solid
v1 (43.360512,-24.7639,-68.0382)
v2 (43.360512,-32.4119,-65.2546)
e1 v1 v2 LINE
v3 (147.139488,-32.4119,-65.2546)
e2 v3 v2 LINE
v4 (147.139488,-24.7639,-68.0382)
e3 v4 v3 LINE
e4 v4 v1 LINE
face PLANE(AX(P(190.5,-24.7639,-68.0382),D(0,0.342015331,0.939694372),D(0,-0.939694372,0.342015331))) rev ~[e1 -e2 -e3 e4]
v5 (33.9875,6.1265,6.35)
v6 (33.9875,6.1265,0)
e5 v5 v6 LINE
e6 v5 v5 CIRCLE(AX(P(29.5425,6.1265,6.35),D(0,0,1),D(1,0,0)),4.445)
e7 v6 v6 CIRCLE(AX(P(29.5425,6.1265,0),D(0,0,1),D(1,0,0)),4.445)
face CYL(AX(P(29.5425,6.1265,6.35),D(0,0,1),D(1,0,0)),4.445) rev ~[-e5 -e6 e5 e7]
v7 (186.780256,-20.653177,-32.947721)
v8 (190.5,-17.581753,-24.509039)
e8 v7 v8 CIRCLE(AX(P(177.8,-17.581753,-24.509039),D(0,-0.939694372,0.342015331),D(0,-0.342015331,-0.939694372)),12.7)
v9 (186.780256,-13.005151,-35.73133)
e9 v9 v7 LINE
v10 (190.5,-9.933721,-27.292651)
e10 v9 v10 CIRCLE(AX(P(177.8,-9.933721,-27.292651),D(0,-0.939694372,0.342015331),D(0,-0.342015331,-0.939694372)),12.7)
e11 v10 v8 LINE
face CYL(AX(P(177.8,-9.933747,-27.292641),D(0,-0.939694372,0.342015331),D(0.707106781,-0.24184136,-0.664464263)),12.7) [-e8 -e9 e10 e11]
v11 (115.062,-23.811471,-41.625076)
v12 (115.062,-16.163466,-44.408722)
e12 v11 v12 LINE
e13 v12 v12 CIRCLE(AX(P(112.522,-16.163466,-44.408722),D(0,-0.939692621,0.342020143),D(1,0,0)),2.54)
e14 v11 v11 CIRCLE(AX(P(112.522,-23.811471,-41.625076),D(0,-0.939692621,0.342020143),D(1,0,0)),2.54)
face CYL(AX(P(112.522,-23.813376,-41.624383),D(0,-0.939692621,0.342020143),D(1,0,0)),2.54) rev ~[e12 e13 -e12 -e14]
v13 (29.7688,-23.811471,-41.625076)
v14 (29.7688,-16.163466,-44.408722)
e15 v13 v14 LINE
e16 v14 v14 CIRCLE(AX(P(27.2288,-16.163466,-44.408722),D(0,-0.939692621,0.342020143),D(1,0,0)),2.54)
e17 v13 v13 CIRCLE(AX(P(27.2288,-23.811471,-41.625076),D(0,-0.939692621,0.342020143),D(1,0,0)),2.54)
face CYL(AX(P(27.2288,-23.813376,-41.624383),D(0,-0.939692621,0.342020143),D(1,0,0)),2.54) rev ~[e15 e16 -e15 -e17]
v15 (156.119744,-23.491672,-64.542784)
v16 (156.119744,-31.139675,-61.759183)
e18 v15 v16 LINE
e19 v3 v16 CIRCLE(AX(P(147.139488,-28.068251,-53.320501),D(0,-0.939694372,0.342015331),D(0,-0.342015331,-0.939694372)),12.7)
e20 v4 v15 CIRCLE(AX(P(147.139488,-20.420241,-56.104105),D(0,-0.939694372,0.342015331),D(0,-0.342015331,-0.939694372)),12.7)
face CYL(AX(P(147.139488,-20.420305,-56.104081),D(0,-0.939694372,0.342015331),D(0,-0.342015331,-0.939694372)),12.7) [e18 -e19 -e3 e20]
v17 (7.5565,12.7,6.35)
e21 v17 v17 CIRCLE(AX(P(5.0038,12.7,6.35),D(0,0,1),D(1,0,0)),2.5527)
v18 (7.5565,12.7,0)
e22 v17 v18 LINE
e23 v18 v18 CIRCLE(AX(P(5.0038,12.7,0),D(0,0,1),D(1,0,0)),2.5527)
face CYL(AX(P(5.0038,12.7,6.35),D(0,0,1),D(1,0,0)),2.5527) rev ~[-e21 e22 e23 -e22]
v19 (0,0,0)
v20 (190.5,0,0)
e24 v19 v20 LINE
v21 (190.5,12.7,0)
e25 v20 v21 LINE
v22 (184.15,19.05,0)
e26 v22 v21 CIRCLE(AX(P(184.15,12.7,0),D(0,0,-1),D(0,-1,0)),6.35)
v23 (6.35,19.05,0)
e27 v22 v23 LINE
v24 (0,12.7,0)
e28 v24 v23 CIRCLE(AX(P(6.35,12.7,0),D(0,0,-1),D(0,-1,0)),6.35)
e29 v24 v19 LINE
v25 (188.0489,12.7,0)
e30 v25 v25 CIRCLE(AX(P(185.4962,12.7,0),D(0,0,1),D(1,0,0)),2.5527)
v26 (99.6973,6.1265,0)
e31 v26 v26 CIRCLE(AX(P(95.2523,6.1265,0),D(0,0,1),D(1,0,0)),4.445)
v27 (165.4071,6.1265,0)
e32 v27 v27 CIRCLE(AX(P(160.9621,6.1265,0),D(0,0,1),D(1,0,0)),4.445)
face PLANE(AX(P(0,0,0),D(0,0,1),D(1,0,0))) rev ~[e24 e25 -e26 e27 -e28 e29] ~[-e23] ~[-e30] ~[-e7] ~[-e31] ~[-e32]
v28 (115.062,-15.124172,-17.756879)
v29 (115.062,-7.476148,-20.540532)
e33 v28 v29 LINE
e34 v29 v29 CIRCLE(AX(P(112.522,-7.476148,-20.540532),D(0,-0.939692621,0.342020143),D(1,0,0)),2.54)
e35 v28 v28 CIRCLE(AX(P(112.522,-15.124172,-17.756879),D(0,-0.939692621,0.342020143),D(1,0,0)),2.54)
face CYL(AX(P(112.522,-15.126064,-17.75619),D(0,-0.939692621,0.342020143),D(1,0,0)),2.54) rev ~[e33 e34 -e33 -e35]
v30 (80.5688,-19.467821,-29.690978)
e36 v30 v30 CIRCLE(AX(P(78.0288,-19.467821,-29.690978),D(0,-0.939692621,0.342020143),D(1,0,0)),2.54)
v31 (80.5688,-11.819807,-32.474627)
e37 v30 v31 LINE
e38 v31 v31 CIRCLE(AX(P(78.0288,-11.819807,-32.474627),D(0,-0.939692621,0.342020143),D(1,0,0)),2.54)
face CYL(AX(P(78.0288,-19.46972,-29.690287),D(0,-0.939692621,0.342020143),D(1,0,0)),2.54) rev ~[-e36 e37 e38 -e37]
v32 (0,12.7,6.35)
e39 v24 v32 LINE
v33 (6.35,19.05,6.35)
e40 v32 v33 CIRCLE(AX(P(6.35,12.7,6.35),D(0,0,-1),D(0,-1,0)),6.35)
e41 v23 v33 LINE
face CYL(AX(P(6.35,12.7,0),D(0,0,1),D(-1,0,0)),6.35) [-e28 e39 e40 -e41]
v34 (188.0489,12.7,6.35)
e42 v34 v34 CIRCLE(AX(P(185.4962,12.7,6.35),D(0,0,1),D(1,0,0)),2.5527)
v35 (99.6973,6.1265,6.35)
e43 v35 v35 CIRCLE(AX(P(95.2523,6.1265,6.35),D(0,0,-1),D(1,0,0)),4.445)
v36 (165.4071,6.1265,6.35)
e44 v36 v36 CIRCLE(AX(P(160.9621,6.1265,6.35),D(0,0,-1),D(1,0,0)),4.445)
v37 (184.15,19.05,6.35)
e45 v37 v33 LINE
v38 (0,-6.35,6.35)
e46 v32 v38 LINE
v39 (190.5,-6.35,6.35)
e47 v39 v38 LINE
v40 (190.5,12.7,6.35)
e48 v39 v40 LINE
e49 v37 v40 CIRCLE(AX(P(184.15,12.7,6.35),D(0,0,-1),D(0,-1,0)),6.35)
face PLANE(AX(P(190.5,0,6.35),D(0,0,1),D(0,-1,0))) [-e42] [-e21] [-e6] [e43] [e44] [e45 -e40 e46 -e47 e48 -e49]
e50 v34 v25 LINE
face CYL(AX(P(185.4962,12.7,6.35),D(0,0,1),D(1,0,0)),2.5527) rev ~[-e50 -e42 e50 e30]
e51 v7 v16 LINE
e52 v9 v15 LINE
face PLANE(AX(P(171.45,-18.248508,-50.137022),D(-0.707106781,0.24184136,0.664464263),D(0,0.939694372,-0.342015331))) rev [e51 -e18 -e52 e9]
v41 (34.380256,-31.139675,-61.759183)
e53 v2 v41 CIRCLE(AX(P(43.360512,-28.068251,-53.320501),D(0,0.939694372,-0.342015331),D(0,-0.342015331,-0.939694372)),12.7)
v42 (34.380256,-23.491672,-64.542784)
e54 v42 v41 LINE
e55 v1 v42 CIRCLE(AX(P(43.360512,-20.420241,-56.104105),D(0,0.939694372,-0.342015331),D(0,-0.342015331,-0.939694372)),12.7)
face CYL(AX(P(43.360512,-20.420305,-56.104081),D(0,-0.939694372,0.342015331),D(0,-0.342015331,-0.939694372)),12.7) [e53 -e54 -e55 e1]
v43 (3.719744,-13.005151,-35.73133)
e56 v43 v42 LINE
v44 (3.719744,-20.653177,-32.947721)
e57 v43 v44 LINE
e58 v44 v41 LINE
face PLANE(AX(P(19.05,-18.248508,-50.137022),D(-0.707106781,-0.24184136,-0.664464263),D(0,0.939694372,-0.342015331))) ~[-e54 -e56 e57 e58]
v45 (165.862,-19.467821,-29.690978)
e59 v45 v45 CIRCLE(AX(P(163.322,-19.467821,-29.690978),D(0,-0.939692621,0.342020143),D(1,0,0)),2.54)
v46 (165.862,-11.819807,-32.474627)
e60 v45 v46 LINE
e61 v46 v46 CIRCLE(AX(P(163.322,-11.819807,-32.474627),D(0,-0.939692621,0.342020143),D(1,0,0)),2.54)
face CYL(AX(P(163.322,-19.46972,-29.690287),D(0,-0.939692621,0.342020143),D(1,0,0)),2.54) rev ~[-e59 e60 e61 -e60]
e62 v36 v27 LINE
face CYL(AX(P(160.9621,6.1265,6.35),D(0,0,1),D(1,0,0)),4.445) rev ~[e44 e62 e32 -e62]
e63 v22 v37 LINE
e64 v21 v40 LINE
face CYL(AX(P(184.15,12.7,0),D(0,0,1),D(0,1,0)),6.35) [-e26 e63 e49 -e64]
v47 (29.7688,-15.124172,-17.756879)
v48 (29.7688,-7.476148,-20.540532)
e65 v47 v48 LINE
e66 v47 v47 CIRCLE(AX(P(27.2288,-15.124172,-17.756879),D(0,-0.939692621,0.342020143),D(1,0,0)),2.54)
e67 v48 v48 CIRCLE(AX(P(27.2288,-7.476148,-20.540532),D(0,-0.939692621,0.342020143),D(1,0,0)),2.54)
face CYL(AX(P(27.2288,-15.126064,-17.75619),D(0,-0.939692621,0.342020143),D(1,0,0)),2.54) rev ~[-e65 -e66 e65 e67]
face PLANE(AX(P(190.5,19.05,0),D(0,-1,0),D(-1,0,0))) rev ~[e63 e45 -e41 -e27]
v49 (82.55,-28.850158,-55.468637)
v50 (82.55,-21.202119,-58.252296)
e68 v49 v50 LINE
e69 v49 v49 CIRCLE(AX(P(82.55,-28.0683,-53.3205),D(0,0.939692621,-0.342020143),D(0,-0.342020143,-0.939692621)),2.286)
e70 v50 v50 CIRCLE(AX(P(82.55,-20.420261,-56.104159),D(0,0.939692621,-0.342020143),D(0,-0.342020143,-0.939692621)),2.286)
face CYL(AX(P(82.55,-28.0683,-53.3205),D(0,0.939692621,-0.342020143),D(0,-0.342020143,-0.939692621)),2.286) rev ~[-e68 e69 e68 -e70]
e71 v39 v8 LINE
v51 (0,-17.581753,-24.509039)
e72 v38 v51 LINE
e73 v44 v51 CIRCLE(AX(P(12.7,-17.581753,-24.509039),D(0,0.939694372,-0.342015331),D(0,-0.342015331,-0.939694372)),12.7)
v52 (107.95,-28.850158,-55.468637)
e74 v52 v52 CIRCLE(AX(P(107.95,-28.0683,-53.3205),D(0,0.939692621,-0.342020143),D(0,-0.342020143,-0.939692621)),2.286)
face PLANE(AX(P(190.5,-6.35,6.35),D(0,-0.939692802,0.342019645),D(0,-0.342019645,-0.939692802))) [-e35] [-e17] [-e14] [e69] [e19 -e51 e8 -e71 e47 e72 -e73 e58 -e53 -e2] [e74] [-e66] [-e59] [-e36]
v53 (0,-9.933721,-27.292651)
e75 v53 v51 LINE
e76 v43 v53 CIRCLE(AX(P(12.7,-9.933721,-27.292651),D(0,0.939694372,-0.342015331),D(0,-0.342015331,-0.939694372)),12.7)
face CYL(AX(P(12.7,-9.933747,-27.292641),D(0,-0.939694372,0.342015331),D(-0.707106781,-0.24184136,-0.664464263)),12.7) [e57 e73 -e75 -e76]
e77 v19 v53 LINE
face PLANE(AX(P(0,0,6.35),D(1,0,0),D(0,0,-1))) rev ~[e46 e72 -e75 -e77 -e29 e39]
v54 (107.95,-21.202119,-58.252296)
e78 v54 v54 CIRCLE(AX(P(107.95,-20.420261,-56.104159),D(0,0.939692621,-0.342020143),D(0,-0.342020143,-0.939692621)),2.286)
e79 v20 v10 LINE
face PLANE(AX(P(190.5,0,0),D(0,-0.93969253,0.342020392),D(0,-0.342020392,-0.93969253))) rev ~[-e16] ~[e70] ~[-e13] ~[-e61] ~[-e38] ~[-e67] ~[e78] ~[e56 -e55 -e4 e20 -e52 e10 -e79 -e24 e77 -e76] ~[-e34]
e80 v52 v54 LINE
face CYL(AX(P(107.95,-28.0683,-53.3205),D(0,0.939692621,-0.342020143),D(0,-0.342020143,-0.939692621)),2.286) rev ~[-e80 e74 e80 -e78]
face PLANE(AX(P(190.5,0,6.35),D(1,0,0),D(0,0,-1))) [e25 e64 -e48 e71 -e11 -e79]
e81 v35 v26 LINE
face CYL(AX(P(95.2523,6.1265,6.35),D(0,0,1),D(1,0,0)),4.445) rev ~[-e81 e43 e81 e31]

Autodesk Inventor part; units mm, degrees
ref_plane "YZ Plane" through (0, 0, 0) normal (1, 0, 0) x (0, 1, 0)
ref_plane "XZ Plane" through (0, 0, 0) normal (0, 1, 0) x (-1, 0, 0)
ref_plane "XY Plane" through (0, 0, 0) normal (0, 0, 1) x (1, 0, 0)
sketch "Sketch1" plane through (0, 0, 0) normal (0, 0, 1) x (1, 0, 0)
  line L0 (0, 0) -> (190.5, 0)
  line L1 (190.5, 0) -> (190.5, 19.05)
  line L2 (190.5, 19.05) -> (0, 19.05)
  line L3 (0, 19.05) -> (0, 0)
  dimension "d0" = 190.5
  dimension "d1" = 19.05
extrude "Extrusion1" add sketch "Sketch1" along normal blind 6.35
sketch "Sketch2" plane through (0, 0, 6.35) normal (0, 0, 1) x (1, 0, 0)
  circle A0 centre (5.0038, 12.7) radius 2.5527
  circle A1 centre (185.4962, 12.7) radius 2.5527
  line L0 (0, 19.05) -> (0, 0) projected
  line L1 (0, 0) -> (190.5, 0) projected
  point P0 (0, 9.525)
  point P1 (0, 9.525)
  dimension "d4" = 5.1054
  dimension "d5" = 5.1054
  dimension "d6" = 180.4924
  dimension "d10" = 5.0038
  dimension "d11" = 12.7
extrude "Extrusion2" cut sketch "Sketch2" against normal blind 6.35
fillet "Fillet1" radius 6.35 2 edges at (190.5, 19.05, 3.175) (0, 19.05, 3.175)
sketch "Sketch3" plane through (190.5, 0, 6.35) normal (1, 0, 0) x (0, 0, -1)
  line L0 (0, -6.35) -> (71.6046, -32.4119)
  line L1 (0, 0) -> (76.2, 0) construction
  line L2 (6.35, 12.7) -> (6.35, 0) projected
  line L3 (6.35, 0) -> (0, 0) projected
  line L4 (6.35, 0) -> (74.3882, -24.7639)
  line L5 (6.35, 0) -> (78.7548, 0) construction
  line L6 (74.3882, -24.7639) -> (71.6046, -32.4119)
  line L7 (0, 0) -> (0, 12.7) projected
  line L8 (0, 0) -> (0, -6.35)
  dimension "d13" = 76.2
  dimension "d14" = 20
  dimension "d17" = 20
  dimension "d18" = 6.35
extrude "Extrusion3" add sketch "Sketch3" against normal up to surface (190.5 mm away)
chamfer "Chamfer1" distance 38.1 angle 45 2 edges at (0, -28.5879, -66.6464) (190.5, -28.5879, -66.6464)
fillet "Fillet2" radius 12.7 4 edges at (38.1, -28.5879, -66.6464) (0, -15.5569, -30.8441) (152.4, -28.5879, -66.6464) (190.5, -15.5569, -30.8441)
sketch "Sketch5" plane through (0, 0, 6.35) normal (0, 0, 1) x (1, 0, 0)
  circle A0 centre (160.9621, 6.1265) radius 4.445
  circle A1 centre (185.4962, 12.7) radius 2.5527 projected
  line L0 (185.4962, 12.7) -> (176.5159, 21.6803)
  line L1 (185.4962, 12.7) -> (198.1962, 12.7) construction
  line L2 (176.5159, 21.6803) -> (160.9621, 6.1265)
  line L3 (160.9621, 6.1265) -> (95.2523, 6.1265)
  line L4 (95.2523, 6.1265) -> (29.5425, 6.1265)
  circle A2 centre (29.5425, 6.1265) radius 4.445
  circle A3 centre (95.2523, 6.1265) radius 4.445
  point P0 (0, 0)
  dimension "d24" = 8.89
  dimension "d25" = 12.7
  dimension "d26" = 135
  dimension "d27" = 21.9964
  dimension "d30" = 65.7098
  dimension "d31" = 65.7098
  dimension "d32" = 8.89
  dimension "d33" = 8.89
extrude "Extrusion4" cut sketch "Sketch5" against normal blind 25.4 contours A0 L3 L2 | L2 L3 A0 | A3 L4 L3 | L3 L4 A3 | A2
sketch "Sketch6" plane through (0, -6.35, 6.35) normal (0, -0.9396926, 0.3420201) x (1, 0, 0)
  circle A0 centre (163.322, -38.354) radius 2.54
  line L0 (190.5, 0) -> (190.5, -32.8395) projected
  line L1 (147.1395, -76.2) -> (43.3605, -76.2) projected
  circle A1 centre (112.522, -51.054) radius 2.54
  circle A2 centre (112.522, -25.654) radius 2.54
  circle A3 centre (78.0288, -38.354) radius 2.54
  circle A4 centre (27.2288, -25.654) radius 2.54
  circle A5 centre (27.2288, -51.054) radius 2.54
  point P0 (0, -3.7952)
  dimension "d34" = 27.178
  dimension "d35" = 37.846
  dimension "d36" = 5.08
  dimension "d39" = 5.08
  dimension "d40" = 12.7
  dimension "d41" = 50.8
  dimension "d42" = 5.08
  dimension "d43" = 50.8
  dimension "d44" = 12.7
  dimension "d45" = 85.2932
  dimension "d46" = 5.08
  dimension "d47" = 5.08
  dimension "d48" = 5.08
  dimension "d51" = 50.8
  dimension "d52" = 50.8
extrude "Extrusion5" cut sketch "Sketch6" against normal blind 25.4
sketch "Sketch8" plane through (0, -6.35, 6.35) normal (0, -0.9396926, 0.3420201) x (1, 0, 0)
  line L0 (147.1395, -76.2) -> (43.3605, -76.2) projected
  line L1 (95.25, -76.2) -> (95.25, -63.5)
  line L2 (95.25, -63.5) -> (82.55, -63.5)
  line L3 (95.25, -63.5) -> (107.95, -63.5)
  point P0 (0, -3.7952)
  dimension "d58" = 12.7
  dimension "d59" = 12.7
  dimension "d60" = 12.7
hole "Hole1" at (82.55, -28.0683, -53.3205) at (107.95, -28.0683, -53.3205) direction (0, 0.9396926, -0.3420201) diameter 4.572 end through all
equation "\"d5\" = d4"
properties part number "Module_SPM_Mount_2.0_SMM"
